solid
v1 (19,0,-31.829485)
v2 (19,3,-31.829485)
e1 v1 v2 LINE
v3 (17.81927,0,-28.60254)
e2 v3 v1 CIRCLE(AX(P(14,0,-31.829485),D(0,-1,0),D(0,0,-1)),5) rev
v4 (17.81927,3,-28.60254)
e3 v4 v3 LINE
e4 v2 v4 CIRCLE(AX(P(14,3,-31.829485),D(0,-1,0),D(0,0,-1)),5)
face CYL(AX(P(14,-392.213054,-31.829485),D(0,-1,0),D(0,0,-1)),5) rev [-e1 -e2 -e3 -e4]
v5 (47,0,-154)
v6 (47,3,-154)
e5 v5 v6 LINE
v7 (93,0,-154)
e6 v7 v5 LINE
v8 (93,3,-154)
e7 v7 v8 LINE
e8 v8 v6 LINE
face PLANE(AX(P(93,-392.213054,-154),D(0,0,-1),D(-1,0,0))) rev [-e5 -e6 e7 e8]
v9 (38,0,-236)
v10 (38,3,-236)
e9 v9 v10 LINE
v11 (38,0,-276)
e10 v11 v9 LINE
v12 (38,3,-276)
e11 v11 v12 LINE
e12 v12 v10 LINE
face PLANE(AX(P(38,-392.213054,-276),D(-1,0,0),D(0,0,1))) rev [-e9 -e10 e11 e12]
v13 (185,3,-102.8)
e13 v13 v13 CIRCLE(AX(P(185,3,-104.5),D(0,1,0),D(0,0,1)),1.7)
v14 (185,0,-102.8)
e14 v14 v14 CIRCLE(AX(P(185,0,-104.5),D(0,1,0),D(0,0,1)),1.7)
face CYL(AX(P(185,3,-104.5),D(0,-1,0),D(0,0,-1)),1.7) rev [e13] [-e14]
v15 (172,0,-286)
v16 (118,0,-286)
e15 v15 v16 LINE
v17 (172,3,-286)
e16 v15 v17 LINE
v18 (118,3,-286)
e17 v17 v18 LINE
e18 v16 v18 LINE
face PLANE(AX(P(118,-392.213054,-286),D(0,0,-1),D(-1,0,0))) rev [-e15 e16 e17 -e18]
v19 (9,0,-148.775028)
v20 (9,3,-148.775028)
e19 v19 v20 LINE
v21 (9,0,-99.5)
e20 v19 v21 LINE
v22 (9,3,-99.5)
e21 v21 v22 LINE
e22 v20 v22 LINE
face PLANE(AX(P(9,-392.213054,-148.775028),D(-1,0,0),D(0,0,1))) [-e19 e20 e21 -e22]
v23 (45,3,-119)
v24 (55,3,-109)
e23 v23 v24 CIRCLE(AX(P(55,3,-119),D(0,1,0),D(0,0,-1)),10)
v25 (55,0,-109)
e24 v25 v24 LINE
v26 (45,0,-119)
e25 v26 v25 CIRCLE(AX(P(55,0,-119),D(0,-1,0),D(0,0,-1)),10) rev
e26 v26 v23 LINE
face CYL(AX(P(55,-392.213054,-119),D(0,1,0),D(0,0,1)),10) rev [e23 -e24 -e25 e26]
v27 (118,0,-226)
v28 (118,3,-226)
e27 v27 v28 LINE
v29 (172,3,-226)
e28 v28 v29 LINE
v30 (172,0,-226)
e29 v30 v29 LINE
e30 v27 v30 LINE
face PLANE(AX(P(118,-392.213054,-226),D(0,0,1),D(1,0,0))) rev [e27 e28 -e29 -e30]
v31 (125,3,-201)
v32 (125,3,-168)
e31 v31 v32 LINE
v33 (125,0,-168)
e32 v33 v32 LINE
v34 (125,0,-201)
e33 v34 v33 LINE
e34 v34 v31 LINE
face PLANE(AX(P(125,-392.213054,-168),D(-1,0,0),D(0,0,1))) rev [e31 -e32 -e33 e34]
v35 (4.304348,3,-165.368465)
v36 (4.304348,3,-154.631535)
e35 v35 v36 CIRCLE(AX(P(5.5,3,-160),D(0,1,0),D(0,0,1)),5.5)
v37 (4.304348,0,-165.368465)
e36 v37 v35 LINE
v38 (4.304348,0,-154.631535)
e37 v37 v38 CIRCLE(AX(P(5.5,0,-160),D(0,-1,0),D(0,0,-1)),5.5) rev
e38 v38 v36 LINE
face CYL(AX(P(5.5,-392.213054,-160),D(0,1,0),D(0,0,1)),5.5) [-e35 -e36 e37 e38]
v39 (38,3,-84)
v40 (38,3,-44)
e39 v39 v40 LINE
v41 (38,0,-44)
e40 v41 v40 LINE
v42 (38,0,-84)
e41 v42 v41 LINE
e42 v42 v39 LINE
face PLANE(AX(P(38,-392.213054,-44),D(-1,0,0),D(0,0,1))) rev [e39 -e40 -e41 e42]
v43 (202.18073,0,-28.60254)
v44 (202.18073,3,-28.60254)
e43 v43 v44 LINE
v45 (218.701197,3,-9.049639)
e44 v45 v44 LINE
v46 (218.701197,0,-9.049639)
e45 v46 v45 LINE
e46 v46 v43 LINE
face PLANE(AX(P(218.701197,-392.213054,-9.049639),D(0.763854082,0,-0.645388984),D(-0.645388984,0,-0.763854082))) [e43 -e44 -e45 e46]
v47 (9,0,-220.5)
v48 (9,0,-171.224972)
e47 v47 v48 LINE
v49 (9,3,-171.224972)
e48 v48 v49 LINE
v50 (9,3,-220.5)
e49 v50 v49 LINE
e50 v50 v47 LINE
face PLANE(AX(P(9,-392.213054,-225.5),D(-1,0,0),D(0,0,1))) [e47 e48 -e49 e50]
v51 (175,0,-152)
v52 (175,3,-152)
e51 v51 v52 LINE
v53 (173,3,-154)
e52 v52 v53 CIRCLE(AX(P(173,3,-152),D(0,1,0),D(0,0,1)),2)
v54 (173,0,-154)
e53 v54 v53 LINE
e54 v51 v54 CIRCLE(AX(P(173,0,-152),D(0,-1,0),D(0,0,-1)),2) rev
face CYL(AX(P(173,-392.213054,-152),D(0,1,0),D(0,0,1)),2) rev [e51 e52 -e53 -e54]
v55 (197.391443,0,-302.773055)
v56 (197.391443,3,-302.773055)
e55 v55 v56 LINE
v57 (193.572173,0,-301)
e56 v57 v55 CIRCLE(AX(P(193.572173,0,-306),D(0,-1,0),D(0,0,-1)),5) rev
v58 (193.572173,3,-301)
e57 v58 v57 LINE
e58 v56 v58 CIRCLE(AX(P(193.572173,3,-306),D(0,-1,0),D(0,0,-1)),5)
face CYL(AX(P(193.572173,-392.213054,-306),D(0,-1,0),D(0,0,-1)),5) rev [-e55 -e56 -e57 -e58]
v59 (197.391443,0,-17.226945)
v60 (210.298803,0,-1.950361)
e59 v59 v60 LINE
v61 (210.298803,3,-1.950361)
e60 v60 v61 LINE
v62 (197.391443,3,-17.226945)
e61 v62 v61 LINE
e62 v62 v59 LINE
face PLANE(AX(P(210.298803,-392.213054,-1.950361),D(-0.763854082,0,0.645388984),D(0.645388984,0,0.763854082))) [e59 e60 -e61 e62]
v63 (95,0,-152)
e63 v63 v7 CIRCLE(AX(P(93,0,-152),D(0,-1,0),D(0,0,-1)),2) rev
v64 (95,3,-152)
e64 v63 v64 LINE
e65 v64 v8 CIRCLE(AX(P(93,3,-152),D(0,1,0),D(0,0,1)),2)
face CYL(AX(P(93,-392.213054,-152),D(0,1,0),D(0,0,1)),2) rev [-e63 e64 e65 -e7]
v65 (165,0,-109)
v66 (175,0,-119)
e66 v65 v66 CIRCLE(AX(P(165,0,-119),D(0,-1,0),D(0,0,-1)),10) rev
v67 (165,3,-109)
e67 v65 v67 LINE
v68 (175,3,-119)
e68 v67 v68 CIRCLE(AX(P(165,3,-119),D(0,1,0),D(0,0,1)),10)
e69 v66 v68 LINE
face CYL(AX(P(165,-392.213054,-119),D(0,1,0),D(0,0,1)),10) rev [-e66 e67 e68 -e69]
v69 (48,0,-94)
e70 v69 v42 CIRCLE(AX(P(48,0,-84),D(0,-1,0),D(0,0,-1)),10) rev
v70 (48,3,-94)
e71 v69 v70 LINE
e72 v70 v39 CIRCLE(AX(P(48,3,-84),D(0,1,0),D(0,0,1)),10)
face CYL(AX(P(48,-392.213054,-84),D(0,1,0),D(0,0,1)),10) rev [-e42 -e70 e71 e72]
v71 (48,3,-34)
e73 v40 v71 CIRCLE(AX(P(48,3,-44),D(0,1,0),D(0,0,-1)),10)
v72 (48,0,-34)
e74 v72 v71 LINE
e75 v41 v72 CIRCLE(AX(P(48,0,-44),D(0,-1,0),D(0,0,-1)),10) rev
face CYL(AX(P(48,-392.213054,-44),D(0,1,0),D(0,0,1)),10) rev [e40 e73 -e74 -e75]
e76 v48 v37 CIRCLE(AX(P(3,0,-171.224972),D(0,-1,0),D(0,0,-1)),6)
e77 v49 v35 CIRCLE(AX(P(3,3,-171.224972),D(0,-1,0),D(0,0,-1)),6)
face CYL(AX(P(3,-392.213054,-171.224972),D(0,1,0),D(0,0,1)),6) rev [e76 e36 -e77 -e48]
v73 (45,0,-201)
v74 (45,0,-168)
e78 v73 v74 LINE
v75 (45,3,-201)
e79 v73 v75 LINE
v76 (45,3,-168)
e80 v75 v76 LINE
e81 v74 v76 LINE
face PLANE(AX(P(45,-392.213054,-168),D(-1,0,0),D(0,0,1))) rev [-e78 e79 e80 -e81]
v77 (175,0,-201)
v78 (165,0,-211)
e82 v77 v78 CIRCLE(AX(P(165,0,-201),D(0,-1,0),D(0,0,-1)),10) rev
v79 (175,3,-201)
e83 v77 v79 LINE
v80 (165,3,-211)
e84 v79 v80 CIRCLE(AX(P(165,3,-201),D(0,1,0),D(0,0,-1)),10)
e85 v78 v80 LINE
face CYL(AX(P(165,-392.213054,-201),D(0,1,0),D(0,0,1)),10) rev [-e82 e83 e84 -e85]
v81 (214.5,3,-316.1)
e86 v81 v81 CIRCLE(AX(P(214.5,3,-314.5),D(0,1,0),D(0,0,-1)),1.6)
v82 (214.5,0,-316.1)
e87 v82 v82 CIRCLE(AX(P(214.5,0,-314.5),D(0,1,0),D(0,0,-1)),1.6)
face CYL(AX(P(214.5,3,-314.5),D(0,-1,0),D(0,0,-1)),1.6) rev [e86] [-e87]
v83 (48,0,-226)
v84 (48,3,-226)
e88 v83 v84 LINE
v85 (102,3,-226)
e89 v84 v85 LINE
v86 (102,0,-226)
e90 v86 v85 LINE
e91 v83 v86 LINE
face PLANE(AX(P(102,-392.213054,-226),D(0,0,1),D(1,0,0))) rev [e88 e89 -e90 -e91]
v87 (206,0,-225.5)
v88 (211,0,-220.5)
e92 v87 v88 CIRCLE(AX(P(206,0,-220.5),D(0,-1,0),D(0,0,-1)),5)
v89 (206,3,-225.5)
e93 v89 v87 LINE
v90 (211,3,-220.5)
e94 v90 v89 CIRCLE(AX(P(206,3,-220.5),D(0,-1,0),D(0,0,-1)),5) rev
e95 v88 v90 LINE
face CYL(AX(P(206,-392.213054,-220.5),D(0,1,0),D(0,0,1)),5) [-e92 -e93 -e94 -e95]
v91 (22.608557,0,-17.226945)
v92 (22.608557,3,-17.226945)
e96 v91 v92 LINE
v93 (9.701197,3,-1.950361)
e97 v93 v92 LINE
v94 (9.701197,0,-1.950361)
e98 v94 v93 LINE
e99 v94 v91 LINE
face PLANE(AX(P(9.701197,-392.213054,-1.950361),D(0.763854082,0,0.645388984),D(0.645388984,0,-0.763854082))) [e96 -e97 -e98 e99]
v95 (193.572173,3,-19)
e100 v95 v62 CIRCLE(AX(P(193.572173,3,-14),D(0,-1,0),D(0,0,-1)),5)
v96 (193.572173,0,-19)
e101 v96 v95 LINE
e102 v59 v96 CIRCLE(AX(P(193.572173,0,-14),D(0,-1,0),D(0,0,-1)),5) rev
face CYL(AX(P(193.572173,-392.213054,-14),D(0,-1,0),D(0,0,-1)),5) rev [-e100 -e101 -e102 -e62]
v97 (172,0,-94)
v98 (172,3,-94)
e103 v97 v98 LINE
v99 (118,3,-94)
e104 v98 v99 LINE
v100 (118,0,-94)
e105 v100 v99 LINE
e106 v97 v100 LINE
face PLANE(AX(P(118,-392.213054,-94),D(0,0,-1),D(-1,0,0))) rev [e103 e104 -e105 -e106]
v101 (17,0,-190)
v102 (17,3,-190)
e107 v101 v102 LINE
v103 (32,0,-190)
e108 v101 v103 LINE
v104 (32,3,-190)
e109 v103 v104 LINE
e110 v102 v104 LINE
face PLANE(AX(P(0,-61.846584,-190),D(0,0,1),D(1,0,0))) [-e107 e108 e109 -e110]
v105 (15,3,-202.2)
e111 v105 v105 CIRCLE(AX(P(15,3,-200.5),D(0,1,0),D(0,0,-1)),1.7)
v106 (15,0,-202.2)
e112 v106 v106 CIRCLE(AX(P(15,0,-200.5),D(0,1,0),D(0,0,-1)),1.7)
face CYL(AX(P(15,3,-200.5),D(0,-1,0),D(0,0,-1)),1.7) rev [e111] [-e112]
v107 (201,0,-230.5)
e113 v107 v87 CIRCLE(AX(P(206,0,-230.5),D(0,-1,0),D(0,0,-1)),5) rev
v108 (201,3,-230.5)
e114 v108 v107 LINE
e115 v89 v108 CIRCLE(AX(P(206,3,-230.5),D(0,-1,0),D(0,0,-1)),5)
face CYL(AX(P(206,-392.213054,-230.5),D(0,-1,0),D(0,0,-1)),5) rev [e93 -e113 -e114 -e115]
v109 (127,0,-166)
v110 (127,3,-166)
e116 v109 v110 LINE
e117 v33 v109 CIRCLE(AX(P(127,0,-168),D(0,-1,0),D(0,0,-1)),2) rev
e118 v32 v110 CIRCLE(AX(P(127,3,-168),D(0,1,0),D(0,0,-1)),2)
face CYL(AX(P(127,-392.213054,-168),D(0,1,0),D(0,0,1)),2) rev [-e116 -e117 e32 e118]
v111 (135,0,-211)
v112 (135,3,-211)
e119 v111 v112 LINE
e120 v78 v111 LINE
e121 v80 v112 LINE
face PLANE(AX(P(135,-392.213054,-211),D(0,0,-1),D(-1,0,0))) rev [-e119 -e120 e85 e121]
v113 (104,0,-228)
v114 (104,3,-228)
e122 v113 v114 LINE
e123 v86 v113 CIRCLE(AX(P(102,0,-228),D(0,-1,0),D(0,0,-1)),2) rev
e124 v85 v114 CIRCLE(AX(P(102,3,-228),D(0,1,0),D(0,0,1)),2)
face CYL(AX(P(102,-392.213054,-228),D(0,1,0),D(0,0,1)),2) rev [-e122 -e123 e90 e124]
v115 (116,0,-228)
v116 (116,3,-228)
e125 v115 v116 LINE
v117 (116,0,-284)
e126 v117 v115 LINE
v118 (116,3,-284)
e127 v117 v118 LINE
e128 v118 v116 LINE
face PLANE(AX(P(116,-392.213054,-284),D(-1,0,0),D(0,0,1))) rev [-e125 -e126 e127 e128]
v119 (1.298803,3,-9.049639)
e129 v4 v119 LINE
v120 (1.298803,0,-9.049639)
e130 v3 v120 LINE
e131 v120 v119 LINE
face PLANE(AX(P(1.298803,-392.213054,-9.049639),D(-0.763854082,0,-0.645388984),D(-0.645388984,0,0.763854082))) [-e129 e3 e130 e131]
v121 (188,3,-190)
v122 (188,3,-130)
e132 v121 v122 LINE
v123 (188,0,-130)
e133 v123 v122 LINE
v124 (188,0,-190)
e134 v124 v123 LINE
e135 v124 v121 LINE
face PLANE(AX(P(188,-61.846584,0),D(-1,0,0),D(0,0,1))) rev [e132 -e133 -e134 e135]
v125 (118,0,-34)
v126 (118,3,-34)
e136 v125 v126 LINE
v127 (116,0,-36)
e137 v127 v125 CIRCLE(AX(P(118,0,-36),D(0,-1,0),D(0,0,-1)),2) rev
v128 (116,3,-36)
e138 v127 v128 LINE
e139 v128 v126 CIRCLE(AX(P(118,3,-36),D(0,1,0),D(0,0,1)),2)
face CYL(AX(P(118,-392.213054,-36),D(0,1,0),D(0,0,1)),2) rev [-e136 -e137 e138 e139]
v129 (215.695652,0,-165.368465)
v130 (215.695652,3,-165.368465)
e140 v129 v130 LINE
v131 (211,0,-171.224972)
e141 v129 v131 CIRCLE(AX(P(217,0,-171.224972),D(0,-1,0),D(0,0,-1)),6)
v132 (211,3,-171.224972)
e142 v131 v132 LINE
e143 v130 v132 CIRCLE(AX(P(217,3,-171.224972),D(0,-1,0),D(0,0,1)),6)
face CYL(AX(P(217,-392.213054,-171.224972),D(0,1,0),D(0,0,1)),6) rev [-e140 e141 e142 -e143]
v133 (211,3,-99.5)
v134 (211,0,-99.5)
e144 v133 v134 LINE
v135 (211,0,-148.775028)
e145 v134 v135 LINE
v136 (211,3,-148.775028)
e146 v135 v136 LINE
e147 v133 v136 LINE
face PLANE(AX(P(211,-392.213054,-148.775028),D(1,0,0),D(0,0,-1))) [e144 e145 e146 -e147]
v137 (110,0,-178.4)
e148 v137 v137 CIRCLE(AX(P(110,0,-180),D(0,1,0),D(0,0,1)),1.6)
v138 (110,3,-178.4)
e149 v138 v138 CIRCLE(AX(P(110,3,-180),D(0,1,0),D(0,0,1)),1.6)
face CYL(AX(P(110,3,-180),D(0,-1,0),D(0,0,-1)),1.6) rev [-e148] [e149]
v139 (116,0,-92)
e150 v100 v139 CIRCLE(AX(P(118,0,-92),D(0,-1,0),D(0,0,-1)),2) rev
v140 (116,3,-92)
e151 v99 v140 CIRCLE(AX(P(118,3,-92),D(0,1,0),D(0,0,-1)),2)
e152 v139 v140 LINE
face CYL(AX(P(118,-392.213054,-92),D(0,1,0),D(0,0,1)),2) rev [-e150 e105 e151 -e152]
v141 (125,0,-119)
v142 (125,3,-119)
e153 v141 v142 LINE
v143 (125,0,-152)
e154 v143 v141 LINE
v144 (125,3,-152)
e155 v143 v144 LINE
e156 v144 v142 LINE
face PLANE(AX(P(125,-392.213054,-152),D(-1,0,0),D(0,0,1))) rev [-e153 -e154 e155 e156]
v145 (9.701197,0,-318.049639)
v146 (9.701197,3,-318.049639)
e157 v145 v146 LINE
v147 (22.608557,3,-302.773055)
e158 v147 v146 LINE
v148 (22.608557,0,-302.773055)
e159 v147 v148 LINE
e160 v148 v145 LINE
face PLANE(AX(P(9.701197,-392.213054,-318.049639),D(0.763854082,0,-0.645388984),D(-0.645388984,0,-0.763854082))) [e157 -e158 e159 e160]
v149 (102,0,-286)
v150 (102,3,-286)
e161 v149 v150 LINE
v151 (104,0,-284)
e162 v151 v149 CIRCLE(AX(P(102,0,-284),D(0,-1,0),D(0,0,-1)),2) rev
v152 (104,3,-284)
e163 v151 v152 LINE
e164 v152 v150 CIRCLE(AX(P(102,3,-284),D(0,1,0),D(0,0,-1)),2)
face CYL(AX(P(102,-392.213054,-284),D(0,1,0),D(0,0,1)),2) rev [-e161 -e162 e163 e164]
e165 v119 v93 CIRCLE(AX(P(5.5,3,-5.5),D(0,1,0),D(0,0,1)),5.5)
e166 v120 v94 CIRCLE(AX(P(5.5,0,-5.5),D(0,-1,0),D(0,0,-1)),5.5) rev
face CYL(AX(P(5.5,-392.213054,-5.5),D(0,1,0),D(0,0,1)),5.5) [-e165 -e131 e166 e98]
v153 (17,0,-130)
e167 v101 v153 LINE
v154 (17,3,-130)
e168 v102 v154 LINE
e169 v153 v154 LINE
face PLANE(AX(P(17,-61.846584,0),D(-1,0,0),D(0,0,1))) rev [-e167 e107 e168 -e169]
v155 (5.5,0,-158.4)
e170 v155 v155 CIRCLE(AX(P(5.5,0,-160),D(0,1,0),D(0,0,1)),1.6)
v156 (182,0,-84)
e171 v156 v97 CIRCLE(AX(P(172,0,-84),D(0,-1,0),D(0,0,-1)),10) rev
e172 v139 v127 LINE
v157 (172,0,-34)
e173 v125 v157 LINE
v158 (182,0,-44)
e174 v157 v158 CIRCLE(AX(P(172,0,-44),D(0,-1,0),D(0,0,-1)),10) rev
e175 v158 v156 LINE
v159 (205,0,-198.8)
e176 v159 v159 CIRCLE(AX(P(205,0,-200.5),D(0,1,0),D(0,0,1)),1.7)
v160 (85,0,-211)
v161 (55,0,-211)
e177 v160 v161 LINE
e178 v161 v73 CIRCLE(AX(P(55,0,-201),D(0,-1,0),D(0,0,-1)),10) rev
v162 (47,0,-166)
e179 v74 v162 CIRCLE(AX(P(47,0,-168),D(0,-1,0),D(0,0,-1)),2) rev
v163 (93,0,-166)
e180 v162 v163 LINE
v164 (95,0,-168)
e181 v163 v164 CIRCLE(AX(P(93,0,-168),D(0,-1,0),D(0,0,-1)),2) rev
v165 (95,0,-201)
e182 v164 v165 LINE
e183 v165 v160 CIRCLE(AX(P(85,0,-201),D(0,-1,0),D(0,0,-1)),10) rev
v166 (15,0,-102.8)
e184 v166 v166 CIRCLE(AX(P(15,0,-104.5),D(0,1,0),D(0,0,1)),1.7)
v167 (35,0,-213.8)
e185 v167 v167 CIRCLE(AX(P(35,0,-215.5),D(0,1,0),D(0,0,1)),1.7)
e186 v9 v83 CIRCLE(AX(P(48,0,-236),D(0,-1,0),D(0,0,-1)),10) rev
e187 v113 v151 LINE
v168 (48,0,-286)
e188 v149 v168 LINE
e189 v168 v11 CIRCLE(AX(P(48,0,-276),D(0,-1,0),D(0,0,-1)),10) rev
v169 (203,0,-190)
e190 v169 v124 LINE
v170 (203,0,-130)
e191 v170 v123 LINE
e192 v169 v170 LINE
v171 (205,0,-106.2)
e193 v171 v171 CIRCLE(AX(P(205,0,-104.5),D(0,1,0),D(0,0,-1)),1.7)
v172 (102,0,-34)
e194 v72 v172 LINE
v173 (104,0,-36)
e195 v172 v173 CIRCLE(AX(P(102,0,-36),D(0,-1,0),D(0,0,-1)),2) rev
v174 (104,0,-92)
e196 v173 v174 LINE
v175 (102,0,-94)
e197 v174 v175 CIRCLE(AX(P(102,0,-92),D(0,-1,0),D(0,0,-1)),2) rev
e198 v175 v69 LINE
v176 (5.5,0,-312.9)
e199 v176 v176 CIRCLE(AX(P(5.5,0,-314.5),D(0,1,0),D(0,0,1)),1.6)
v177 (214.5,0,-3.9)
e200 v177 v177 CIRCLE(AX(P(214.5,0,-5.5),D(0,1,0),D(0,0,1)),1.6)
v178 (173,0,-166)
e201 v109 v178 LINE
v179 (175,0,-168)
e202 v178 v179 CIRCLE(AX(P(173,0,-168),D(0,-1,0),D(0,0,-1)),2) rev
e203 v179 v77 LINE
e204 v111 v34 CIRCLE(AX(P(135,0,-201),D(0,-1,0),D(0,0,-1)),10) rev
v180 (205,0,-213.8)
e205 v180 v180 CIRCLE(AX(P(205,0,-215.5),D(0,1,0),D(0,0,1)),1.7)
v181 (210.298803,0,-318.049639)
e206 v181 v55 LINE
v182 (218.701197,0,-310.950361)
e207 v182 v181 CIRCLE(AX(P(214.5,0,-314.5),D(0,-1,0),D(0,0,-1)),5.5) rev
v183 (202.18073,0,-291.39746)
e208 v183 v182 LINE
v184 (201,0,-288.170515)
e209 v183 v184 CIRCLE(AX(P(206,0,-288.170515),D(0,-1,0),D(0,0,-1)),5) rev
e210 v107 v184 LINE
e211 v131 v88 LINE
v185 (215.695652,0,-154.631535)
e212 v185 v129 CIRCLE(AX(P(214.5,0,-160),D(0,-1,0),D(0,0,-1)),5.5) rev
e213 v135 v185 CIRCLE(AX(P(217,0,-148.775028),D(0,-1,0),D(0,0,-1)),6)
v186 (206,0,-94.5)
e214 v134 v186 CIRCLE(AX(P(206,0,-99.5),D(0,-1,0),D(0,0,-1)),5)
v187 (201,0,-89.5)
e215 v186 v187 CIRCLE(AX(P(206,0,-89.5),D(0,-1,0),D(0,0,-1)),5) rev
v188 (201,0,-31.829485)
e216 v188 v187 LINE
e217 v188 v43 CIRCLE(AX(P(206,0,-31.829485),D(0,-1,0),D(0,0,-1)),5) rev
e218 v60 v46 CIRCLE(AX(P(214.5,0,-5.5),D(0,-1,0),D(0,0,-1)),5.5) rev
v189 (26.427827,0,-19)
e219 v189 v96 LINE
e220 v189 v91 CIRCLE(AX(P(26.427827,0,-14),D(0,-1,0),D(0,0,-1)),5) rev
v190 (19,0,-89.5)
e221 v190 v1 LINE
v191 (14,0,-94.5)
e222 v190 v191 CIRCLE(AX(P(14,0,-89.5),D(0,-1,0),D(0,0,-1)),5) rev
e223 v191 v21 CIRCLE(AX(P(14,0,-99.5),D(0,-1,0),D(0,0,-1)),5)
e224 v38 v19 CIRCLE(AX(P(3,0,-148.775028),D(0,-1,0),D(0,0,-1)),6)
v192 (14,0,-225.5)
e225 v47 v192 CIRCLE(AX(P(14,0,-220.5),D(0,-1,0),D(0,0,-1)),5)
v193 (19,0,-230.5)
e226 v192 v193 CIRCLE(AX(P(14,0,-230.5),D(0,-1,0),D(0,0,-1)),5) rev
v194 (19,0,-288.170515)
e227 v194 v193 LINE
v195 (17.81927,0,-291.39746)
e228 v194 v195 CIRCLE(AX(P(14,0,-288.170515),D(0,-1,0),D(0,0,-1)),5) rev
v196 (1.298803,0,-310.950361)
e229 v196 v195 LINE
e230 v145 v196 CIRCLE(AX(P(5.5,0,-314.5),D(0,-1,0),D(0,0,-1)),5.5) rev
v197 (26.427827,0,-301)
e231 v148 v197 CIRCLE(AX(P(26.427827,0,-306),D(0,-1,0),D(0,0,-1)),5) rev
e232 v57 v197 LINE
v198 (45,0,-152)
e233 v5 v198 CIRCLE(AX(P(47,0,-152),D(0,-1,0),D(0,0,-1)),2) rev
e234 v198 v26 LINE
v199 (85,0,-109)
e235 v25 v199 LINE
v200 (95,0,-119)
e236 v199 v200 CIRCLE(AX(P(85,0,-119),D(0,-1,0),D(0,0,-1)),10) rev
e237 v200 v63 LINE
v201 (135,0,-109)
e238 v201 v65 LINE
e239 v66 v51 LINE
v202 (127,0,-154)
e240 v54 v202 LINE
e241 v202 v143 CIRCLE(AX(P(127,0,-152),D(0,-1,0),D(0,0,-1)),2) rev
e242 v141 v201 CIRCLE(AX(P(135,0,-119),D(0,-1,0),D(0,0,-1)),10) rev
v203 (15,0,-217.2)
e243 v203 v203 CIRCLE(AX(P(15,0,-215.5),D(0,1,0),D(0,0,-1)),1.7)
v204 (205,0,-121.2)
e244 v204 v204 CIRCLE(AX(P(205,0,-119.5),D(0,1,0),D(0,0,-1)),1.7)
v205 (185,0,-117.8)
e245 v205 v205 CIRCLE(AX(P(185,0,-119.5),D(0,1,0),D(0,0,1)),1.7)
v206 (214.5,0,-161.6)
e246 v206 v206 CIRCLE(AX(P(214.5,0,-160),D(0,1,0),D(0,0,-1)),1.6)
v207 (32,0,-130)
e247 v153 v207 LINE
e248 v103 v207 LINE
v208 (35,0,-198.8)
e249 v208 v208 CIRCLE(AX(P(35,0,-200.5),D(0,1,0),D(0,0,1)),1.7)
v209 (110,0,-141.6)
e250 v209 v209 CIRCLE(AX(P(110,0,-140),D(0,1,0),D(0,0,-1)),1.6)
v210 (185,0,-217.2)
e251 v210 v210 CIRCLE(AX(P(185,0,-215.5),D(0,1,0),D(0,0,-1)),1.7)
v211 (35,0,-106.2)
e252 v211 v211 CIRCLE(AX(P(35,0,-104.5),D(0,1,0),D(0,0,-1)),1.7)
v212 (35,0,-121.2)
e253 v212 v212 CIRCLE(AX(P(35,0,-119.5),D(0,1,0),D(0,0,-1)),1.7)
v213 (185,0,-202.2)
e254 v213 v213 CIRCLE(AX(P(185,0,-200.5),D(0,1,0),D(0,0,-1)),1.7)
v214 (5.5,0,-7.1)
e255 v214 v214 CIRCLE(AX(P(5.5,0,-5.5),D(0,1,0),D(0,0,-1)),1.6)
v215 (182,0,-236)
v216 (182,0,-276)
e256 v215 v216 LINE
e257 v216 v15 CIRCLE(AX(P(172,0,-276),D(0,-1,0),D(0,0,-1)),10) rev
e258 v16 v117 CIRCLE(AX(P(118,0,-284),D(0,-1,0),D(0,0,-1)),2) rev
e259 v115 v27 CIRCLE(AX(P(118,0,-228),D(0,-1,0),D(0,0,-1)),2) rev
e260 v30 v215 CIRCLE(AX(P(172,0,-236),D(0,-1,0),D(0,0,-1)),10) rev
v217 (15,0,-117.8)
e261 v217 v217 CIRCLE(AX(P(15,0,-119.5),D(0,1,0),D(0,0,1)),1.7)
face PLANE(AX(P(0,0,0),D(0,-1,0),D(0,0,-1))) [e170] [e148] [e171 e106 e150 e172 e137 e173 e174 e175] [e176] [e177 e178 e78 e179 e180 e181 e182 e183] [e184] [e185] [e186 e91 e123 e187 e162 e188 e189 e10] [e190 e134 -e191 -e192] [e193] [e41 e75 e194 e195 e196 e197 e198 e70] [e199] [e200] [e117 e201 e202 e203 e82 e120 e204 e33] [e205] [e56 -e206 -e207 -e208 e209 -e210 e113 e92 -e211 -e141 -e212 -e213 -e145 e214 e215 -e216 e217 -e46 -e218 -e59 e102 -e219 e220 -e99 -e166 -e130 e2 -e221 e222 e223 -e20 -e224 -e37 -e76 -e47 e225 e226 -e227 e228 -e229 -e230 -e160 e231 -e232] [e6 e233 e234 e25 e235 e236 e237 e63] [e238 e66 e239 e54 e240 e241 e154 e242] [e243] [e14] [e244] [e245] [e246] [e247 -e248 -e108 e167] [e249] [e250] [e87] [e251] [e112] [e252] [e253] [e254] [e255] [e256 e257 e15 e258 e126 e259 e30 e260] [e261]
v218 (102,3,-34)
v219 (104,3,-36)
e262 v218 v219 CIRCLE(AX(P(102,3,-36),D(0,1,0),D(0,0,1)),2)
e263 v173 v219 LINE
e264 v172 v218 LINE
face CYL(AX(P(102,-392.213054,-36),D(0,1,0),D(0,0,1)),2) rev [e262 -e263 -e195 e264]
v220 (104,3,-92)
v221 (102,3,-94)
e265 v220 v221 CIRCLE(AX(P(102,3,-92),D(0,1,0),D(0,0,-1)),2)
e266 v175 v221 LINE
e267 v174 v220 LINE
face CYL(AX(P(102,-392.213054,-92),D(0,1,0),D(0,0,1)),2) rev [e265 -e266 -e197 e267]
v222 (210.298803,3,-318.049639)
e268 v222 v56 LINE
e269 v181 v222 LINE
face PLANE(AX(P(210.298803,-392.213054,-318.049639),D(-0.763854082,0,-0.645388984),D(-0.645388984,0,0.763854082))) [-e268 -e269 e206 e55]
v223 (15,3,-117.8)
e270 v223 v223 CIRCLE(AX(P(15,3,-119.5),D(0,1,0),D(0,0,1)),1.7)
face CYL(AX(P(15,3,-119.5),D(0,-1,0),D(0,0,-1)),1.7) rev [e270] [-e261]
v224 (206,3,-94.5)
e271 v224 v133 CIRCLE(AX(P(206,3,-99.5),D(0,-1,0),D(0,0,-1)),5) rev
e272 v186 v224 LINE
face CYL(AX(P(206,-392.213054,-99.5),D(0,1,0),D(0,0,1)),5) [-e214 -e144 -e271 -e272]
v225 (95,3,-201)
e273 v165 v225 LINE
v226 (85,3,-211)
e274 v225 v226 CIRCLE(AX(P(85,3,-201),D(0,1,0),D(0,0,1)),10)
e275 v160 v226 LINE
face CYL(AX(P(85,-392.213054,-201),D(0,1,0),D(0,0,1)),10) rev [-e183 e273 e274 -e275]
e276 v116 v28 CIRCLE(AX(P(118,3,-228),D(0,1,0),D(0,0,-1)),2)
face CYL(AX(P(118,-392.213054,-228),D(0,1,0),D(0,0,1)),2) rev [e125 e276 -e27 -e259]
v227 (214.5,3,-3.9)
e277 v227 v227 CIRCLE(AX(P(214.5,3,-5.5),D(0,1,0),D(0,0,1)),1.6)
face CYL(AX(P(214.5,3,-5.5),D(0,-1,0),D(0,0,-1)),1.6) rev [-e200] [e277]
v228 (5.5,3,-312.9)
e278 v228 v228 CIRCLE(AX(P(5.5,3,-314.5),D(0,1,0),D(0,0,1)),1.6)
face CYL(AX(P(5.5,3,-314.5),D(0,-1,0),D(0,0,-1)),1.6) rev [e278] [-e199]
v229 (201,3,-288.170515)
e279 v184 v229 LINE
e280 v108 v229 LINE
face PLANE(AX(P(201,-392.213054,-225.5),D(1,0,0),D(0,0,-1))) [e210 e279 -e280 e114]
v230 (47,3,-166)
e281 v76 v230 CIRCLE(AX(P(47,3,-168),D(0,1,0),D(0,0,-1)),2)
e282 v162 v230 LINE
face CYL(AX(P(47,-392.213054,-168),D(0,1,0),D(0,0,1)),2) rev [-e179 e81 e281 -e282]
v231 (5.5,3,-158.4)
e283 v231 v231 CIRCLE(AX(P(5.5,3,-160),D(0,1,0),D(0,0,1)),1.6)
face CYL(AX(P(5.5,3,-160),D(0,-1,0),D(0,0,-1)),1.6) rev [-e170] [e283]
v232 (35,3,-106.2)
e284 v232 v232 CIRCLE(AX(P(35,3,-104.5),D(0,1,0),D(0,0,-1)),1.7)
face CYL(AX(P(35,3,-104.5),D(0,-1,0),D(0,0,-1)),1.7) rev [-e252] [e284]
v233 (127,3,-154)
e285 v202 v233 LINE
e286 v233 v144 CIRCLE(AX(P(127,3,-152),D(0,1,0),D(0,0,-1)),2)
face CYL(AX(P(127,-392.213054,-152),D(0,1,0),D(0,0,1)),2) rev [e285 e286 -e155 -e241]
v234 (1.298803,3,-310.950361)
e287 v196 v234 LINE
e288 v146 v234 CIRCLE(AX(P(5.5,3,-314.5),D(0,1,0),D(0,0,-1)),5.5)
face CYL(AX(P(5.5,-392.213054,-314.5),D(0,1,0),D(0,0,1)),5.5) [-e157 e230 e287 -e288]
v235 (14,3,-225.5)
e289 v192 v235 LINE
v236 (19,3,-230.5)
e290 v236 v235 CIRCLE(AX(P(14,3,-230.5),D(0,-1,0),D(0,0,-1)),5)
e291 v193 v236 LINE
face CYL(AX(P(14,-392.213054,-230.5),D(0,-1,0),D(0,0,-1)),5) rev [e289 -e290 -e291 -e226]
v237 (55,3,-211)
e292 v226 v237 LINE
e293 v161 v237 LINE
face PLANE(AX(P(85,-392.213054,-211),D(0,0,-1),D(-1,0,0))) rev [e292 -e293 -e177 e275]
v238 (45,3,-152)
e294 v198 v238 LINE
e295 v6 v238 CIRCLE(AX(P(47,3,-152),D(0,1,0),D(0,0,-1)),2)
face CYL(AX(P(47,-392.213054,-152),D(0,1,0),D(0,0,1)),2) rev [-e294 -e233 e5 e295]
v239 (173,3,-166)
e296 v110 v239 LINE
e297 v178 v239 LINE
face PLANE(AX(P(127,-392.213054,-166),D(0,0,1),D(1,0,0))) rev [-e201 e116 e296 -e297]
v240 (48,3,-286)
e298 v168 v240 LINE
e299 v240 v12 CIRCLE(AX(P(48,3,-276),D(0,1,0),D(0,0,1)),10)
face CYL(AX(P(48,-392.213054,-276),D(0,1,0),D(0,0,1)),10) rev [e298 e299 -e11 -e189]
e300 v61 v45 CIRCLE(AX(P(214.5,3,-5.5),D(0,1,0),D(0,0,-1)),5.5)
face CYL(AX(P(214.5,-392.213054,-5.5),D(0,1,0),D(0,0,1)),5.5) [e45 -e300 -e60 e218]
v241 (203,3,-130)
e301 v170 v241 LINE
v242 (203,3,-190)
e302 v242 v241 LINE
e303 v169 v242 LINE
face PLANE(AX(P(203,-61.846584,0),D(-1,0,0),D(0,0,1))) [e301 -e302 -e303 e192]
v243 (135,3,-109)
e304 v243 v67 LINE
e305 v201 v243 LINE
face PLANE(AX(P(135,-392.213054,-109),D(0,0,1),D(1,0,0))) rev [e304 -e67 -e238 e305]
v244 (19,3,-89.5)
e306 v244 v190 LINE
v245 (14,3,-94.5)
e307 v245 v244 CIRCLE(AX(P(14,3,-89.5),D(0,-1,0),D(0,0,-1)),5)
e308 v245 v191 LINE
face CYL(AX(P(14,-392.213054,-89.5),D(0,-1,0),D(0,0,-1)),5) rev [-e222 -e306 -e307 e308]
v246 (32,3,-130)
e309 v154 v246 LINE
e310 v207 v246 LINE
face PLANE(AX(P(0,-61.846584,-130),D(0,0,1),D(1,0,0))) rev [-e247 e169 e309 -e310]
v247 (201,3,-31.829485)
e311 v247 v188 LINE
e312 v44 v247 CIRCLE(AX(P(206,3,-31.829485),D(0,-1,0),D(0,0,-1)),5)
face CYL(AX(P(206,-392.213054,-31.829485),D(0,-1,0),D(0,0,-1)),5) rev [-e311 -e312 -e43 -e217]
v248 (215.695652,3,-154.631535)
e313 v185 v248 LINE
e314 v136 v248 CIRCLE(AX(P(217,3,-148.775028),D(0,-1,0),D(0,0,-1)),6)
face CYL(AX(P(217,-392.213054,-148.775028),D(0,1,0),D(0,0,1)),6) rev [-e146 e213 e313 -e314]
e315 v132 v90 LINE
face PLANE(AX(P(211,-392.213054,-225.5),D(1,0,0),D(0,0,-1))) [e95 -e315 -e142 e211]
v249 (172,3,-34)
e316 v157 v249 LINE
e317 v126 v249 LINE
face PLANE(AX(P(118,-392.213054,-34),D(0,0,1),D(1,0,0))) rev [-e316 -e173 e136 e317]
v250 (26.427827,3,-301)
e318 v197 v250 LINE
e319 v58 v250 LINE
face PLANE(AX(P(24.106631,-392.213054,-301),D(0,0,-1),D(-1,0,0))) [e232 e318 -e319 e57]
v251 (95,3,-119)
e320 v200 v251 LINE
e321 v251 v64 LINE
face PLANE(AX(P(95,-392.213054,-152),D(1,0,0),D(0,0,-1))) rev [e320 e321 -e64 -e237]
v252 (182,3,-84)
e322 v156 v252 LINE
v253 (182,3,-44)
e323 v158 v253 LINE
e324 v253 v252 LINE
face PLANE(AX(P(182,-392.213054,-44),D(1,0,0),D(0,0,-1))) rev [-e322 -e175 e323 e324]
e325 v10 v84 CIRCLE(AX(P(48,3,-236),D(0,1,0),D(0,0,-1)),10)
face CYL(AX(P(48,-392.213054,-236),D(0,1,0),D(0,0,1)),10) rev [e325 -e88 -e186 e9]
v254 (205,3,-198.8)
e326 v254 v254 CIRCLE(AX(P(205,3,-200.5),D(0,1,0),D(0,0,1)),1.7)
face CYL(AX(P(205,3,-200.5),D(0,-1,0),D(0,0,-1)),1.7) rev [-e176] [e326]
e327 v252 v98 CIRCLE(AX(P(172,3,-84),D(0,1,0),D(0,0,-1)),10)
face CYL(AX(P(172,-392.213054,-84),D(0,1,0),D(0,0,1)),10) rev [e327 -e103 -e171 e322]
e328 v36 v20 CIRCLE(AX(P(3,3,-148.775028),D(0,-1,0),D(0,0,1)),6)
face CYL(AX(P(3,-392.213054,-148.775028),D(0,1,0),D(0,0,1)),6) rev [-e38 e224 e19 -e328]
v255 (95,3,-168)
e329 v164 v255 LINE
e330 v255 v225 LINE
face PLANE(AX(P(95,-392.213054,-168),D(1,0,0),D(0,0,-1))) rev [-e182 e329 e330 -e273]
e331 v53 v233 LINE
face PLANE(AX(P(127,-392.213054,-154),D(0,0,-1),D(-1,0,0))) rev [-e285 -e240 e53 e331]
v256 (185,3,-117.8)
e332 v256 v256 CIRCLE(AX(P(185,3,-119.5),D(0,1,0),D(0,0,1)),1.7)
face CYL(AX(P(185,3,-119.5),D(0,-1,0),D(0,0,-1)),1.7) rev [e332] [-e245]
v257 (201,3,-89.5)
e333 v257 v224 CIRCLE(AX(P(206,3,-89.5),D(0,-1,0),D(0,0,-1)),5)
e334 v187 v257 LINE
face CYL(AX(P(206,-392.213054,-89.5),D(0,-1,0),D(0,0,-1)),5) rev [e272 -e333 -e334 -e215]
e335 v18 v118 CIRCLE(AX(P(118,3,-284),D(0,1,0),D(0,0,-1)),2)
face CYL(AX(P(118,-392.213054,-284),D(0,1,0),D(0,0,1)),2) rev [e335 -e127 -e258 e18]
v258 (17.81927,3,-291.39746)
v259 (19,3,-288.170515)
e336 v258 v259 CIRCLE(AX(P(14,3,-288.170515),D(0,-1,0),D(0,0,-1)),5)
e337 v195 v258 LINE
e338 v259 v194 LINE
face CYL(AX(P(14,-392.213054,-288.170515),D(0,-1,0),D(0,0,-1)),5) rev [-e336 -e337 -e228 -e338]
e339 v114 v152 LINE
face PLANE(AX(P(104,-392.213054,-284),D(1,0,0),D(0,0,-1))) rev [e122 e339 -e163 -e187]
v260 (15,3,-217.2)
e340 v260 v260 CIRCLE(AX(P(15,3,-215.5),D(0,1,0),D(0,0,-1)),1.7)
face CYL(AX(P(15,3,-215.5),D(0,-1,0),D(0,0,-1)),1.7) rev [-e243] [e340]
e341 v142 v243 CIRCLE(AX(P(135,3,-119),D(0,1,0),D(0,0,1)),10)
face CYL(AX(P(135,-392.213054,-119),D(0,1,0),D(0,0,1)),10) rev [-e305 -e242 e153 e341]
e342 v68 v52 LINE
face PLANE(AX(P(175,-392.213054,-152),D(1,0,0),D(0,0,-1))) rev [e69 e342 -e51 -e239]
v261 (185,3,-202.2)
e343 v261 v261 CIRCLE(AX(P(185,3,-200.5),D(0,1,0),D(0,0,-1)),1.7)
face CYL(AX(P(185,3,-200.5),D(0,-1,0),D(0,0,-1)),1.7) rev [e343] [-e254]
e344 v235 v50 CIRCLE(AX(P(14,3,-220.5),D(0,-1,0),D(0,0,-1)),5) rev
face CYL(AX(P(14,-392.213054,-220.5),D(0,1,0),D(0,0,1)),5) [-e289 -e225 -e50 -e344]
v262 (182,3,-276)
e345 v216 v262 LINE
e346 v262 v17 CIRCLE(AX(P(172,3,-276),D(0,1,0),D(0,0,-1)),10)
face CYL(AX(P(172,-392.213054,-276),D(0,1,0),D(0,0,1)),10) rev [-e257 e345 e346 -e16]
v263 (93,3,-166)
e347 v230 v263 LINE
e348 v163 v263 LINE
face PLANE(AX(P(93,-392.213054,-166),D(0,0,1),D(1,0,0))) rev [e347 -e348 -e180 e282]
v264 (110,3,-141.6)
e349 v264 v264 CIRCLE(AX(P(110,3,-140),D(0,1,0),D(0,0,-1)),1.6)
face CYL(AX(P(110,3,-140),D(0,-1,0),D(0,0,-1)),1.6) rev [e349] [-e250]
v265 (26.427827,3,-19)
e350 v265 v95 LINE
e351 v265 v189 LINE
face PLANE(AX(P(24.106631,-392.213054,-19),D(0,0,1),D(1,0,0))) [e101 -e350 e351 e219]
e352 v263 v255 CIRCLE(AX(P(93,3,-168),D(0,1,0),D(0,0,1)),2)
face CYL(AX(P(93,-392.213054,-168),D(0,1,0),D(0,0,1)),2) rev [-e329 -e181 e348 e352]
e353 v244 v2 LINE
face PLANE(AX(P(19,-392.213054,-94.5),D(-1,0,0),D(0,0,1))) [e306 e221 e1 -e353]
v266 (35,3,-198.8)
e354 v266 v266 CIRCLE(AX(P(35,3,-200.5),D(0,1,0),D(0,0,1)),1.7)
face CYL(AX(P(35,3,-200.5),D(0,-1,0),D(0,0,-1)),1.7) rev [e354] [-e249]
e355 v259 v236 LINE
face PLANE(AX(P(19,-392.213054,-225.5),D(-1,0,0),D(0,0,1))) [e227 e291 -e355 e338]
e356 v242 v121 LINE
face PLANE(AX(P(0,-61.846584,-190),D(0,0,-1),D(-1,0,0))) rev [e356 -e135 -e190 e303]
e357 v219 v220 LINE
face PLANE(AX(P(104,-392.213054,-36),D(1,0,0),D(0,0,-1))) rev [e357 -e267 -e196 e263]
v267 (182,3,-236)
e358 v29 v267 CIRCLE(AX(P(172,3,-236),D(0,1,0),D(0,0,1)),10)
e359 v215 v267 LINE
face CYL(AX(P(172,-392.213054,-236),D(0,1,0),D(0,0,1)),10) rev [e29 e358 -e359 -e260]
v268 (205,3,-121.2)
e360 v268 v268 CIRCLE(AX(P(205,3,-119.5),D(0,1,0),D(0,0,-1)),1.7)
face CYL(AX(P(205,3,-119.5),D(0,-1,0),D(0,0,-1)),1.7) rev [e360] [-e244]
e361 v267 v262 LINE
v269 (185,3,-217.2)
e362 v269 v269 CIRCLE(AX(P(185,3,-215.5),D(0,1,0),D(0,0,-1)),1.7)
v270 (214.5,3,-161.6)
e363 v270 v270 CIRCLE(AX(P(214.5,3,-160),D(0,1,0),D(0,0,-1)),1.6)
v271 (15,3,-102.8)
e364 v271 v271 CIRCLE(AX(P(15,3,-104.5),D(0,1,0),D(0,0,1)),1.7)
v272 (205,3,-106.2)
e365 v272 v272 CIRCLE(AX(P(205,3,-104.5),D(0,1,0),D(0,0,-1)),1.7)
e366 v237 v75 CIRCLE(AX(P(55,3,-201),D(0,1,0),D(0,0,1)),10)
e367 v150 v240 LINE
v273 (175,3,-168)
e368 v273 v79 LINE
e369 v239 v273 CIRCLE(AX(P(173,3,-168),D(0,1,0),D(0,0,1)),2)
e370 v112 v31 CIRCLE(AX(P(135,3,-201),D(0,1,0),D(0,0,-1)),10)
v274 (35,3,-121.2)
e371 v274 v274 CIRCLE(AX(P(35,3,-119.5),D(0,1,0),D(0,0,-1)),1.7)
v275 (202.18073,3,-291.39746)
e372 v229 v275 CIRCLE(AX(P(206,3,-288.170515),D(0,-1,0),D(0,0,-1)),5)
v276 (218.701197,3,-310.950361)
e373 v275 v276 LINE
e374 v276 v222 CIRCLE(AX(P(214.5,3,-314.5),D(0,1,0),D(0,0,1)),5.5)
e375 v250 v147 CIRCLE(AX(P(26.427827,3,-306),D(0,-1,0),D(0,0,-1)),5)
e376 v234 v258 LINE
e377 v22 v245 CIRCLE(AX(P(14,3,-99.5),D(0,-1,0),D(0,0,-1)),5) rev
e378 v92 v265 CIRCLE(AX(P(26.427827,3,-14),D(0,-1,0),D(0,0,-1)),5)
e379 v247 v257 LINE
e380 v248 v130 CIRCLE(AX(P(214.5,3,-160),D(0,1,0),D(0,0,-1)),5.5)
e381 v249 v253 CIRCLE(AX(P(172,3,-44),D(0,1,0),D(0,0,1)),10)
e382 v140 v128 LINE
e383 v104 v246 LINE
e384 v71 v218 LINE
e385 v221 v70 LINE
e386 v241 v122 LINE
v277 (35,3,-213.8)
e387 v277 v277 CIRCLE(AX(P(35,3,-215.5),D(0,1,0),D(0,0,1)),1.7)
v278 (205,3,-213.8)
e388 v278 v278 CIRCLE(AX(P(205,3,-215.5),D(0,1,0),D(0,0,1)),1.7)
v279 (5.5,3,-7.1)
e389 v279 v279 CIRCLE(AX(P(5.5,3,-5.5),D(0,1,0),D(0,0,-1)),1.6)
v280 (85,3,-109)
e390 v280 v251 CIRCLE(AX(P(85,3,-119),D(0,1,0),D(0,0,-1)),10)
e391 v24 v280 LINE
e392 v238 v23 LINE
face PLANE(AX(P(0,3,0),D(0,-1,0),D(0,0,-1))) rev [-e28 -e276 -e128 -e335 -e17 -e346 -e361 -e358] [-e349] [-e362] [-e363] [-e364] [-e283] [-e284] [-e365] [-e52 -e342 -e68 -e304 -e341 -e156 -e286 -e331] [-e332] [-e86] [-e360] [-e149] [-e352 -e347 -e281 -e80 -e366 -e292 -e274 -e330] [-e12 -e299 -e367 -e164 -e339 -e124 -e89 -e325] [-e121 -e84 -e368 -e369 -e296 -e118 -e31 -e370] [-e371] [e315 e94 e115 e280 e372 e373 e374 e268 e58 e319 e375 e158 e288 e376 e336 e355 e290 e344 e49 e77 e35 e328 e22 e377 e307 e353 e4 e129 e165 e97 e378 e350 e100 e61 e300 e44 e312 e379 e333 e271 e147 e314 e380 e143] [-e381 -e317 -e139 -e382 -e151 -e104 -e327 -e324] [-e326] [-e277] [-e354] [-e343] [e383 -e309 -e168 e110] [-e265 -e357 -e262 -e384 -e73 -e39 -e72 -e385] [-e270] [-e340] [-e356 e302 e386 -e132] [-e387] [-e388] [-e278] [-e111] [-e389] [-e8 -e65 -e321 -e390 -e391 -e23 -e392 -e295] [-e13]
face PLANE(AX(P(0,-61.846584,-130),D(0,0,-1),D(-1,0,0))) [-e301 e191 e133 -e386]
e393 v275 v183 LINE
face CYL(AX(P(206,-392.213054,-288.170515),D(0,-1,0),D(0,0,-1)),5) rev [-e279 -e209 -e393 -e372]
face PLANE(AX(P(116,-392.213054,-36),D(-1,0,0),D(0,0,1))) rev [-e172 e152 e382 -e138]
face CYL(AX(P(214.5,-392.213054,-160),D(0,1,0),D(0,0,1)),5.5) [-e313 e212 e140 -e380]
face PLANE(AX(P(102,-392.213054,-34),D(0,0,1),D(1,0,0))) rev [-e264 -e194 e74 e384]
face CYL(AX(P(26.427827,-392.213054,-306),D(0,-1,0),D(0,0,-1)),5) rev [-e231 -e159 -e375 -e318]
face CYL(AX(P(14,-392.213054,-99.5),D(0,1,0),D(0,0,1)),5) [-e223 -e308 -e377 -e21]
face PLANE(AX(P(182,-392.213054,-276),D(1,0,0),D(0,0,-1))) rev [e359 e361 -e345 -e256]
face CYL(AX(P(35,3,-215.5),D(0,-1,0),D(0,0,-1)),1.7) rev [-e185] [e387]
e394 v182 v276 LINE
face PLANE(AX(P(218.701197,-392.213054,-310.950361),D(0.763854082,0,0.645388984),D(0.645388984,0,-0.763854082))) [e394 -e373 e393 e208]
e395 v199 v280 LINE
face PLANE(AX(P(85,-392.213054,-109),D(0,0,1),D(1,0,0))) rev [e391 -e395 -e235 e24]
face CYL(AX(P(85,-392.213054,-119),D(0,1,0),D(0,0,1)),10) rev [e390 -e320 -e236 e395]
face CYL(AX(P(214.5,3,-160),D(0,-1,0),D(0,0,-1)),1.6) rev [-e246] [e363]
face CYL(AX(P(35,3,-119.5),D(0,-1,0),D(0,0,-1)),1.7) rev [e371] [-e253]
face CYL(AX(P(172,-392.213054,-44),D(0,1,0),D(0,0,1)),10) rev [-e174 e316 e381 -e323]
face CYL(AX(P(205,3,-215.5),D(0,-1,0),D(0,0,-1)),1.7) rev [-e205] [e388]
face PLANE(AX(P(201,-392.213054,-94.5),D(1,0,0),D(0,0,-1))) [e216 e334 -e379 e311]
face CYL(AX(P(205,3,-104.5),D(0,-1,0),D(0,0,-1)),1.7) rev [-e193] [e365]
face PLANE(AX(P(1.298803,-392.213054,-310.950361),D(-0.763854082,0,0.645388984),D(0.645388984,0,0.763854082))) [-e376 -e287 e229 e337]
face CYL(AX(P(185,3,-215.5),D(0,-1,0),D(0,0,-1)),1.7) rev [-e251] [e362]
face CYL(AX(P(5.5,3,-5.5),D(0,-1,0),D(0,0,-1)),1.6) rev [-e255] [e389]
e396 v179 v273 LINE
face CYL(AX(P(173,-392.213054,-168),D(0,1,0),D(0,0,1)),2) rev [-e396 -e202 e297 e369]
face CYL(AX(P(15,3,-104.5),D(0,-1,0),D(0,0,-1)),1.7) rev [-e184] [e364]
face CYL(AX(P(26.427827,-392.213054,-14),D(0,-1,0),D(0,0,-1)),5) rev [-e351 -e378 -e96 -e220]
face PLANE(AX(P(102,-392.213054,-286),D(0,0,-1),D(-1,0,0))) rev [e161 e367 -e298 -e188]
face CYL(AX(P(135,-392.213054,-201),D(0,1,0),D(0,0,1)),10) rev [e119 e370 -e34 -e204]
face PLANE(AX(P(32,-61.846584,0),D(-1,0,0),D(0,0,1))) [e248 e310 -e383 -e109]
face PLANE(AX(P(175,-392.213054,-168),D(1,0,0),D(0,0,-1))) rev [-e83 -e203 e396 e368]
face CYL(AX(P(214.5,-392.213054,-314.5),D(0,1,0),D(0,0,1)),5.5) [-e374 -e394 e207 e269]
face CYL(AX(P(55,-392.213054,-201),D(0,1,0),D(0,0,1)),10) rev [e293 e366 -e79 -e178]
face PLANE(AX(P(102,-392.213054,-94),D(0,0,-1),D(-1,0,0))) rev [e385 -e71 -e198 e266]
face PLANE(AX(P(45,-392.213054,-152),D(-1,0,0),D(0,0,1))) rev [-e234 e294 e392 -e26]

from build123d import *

# Parameters (mm, degrees)
CROQUIS1_W              = 220
CROQUIS1_H              = 320
CROQUIS1_R              = 1.7
CROQUIS1_R_2            = 1.6
SALIENTE_EXTRUIR1_DEPTH = 3
CROQUIS2_OUTSIDE_W      = 299.668
CROQUIS2_OUTSIDE_H      = 399.668
CORTAR_EXTRUIR1_DEPTH   = 3
REDONDEO1_R             = 5
CROQUIS4_W              = 15
CROQUIS4_H              = 60
CORTAR_EXTRUIR3_DEPTH   = 3


with BuildPart() as part:
    # Croquis1 → Saliente-Extruir1 (new body)
    with BuildSketch(Plane(origin=(0, 0, 0), x_dir=(1, 0, 0), z_dir=(0, 1, 0))):
        with Locations((110, 160)):
            Rectangle(CROQUIS1_W, CROQUIS1_H)
        with Locations(Location((35, 215.5, 0), (0, 0, 270))):
            Circle(CROQUIS1_R, mode=Mode.SUBTRACT)
        with Locations(Location((35, 200.5, 0), (0, 0, 270))):
            Circle(CROQUIS1_R, mode=Mode.SUBTRACT)
        with Locations(Location((35, 119.5, 0), (0, 0, 90))):
            Circle(CROQUIS1_R, mode=Mode.SUBTRACT)
        with Locations(Location((35, 104.5, 0), (0, 0, 90))):
            Circle(CROQUIS1_R, mode=Mode.SUBTRACT)
        with Locations(Location((5.5, 314.5, 0), (0, 0, 270))):
            Circle(CROQUIS1_R_2, mode=Mode.SUBTRACT)
        with Locations(Location((214.5, 314.5, 0), (0, 0, 90))):
            Circle(CROQUIS1_R_2, mode=Mode.SUBTRACT)
        with Locations(Location((214.5, 5.5, 0), (0, 0, 270))):
            Circle(CROQUIS1_R_2, mode=Mode.SUBTRACT)
        with Locations(Location((5.5, 5.5, 0), (0, 0, 90))):
            Circle(CROQUIS1_R_2, mode=Mode.SUBTRACT)
        with Locations(Location((15, 200.5, 0), (0, 0, 90))):
            Circle(CROQUIS1_R, mode=Mode.SUBTRACT)
        with Locations(Location((15, 215.5, 0), (0, 0, 90))):
            Circle(CROQUIS1_R, mode=Mode.SUBTRACT)
        with Locations(Location((15, 104.5, 0), (0, 0, 270))):
            Circle(CROQUIS1_R, mode=Mode.SUBTRACT)
        with Locations(Location((15, 119.5, 0), (0, 0, 270))):
            Circle(CROQUIS1_R, mode=Mode.SUBTRACT)
        with Locations(Location((110, 180, 0), (0, 0, 270))):
            Circle(CROQUIS1_R_2, mode=Mode.SUBTRACT)
        with Locations(Location((110, 140, 0), (0, 0, 90))):
            Circle(CROQUIS1_R_2, mode=Mode.SUBTRACT)
        with Locations(Location((5.5, 160, 0), (0, 0, 270))):
            Circle(CROQUIS1_R_2, mode=Mode.SUBTRACT)
        with Locations(Location((214.5, 160, 0), (0, 0, 90))):
            Circle(CROQUIS1_R_2, mode=Mode.SUBTRACT)
        with Locations(Location((185, 104.5, 0), (0, 0, 270))):
            Circle(CROQUIS1_R, mode=Mode.SUBTRACT)
        with Locations(Location((185, 119.5, 0), (0, 0, 270))):
            Circle(CROQUIS1_R, mode=Mode.SUBTRACT)
        with Locations(Location((205, 119.5, 0), (0, 0, 90))):
            Circle(CROQUIS1_R, mode=Mode.SUBTRACT)
        with Locations(Location((205, 104.5, 0), (0, 0, 90))):
            Circle(CROQUIS1_R, mode=Mode.SUBTRACT)
        with Locations(Location((185, 215.5, 0), (0, 0, 90))):
            Circle(CROQUIS1_R, mode=Mode.SUBTRACT)
        with Locations(Location((185, 200.5, 0), (0, 0, 90))):
            Circle(CROQUIS1_R, mode=Mode.SUBTRACT)
        with Locations(Location((205, 200.5, 0), (0, 0, 270))):
            Circle(CROQUIS1_R, mode=Mode.SUBTRACT)
        with Locations(Location((205, 215.5, 0), (0, 0, 270))):
            Circle(CROQUIS1_R, mode=Mode.SUBTRACT)
    extrude(amount=SALIENTE_EXTRUIR1_DEPTH)

    # Croquis2 outside → Cortar-Extruir1 (cut)
    # profile 1 of 9: a face of its own
    with BuildSketch(Plane(origin=(0, 3, 0), x_dir=(1, 0, 0), z_dir=(0, 1, 0))):
        with Locations((110, 160)):
            Rectangle(CROQUIS2_OUTSIDE_W, CROQUIS2_OUTSIDE_H)
        with BuildLine():
            Line((9, 148.77502784), (9, 94.5))
            Line((9, 94.5), (19, 94.5))
            Line((19, 94.5), (19, 30))
            Line((19, 30), (1.298802547, 9.049639413))
            ThreePointArc((1.298802547, 9.049639413), (1.950360587, 1.298802547), (9.701197453, 1.950360587))
            Line((9.701197453, 1.950360587), (24.106631311, 19))
            Line((24.106631311, 19), (195.893368689, 19))
            Line((195.893368689, 19), (210.298802547, 1.950360587))
            ThreePointArc((210.298802547, 1.950360587), (218.049639413, 1.298802547), (218.701197453, 9.049639413))
            Line((218.701197453, 9.049639413), (201, 30))
            Line((201, 30), (201, 94.5))
            Line((201, 94.5), (211, 94.5))
            Line((211, 94.5), (211, 148.77502784))
            ThreePointArc((211, 148.77502784), (212.318863014, 152.528287293), (215.695652174, 154.631535054))
            ThreePointArc((215.695652174, 154.631535054), (220, 160), (215.695652174, 165.368464946))
            ThreePointArc((215.695652174, 165.368464946), (212.318863014, 167.471712707), (211, 171.22497216))
            Line((211, 171.22497216), (211, 225.5))
            Line((211, 225.5), (201, 225.5))
            Line((201, 225.5), (201, 290))
            Line((201, 290), (218.701197453, 310.950360587))
            ThreePointArc((218.701197453, 310.950360587), (218.049639413, 318.701197453), (210.298802547, 318.049639413))
            Line((210.298802547, 318.049639413), (195.893368689, 301))
            Line((195.893368689, 301), (24.106631311, 301))
            Line((24.106631311, 301), (9.701197453, 318.049639413))
            ThreePointArc((9.701197453, 318.049639413), (1.950360587, 318.701197453), (1.298802547, 310.950360587))
            Line((1.298802547, 310.950360587), (19, 290))
            Line((19, 290), (19, 225.5))
            Line((19, 225.5), (9, 225.5))
            Line((9, 225.5), (9, 171.22497216))
            ThreePointArc((9, 171.22497216), (7.681136986, 167.471712707), (4.304347826, 165.368464946))
            ThreePointArc((4.304347826, 165.368464946), (0, 160), (4.304347826, 154.631535054))
            ThreePointArc((4.304347826, 154.631535054), (7.681136986, 152.528287293), (9, 148.77502784))
        make_face(mode=Mode.SUBTRACT)
    # profile 2 of 9: a face of its own
    with BuildSketch(Plane(origin=(0, 3, 0), x_dir=(1, 0, 0), z_dir=(0, 1, 0))):
        with BuildLine():
            Line((182, 276), (182, 236))
            ThreePointArc((182, 236), (179.071067812, 228.928932188), (172, 226))
            Line((172, 226), (118, 226))
            ThreePointArc((118, 226), (116.585786438, 226.585786438), (116, 228))
            Line((116, 228), (116, 284))
            ThreePointArc((116, 284), (116.585786438, 285.414213562), (118, 286))
            Line((118, 286), (172, 286))
            ThreePointArc((172, 286), (179.071067812, 283.071067812), (182, 276))
        make_face()
    # profile 3 of 9: a face of its own
    with BuildSketch(Plane(origin=(0, 3, 0), x_dir=(1, 0, 0), z_dir=(0, 1, 0))):
        with BuildLine():
            Line((102, 286), (48, 286))
            ThreePointArc((48, 286), (40.928932188, 283.071067812), (38, 276))
            Line((38, 276), (38, 236))
            ThreePointArc((38, 236), (40.928932188, 228.928932188), (48, 226))
            Line((48, 226), (102, 226))
            ThreePointArc((102, 226), (103.414213562, 226.585786438), (104, 228))
            Line((104, 228), (104, 284))
            ThreePointArc((104, 284), (103.414213562, 285.414213562), (102, 286))
        make_face()
    # profile 4 of 9: a face of its own
    with BuildSketch(Plane(origin=(0, 3, 0), x_dir=(1, 0, 0), z_dir=(0, 1, 0))):
        with BuildLine():
            Line((102, 94), (48, 94))
            ThreePointArc((48, 94), (40.928932188, 91.071067812), (38, 84))
            Line((38, 84), (38, 44))
            ThreePointArc((38, 44), (40.928932188, 36.928932188), (48, 34))
            Line((48, 34), (102, 34))
            ThreePointArc((102, 34), (103.414213562, 34.585786438), (104, 36))
            Line((104, 36), (104, 92))
            ThreePointArc((104, 92), (103.414213562, 93.414213562), (102, 94))
        make_face()
    # profile 5 of 9: a face of its own
    with BuildSketch(Plane(origin=(0, 3, 0), x_dir=(1, 0, 0), z_dir=(0, 1, 0))):
        with BuildLine():
            Line((116, 36), (116, 92))
            ThreePointArc((116, 92), (116.585786438, 93.414213562), (118, 94))
            Line((118, 94), (172, 94))
            ThreePointArc((172, 94), (179.071067812, 91.071067812), (182, 84))
            Line((182, 84), (182, 44))
            ThreePointArc((182, 44), (179.071067812, 36.928932188), (172, 34))
            Line((172, 34), (118, 34))
            ThreePointArc((118, 34), (116.585786438, 34.585786438), (116, 36))
        make_face()
    # profile 6 of 9: a face of its own
    with BuildSketch(Plane(origin=(0, 3, 0), x_dir=(1, 0, 0), z_dir=(0, 1, 0))):
        with BuildLine():
            Line((45, 152), (45, 119))
            ThreePointArc((45, 119), (47.928932188, 111.928932188), (55, 109))
            Line((55, 109), (85, 109))
            ThreePointArc((85, 109), (92.071067812, 111.928932188), (95, 119))
            Line((95, 119), (95, 152))
            ThreePointArc((95, 152), (94.414213562, 153.414213562), (93, 154))
            Line((93, 154), (47, 154))
            ThreePointArc((47, 154), (45.585786438, 153.414213562), (45, 152))
        make_face()
    # profile 7 of 9: a face of its own
    with BuildSketch(Plane(origin=(0, 3, 0), x_dir=(1, 0, 0), z_dir=(0, 1, 0))):
        with BuildLine():
            Line((93, 166), (47, 166))
            ThreePointArc((47, 166), (45.585786438, 166.585786438), (45, 168))
            Line((45, 168), (45, 201))
            ThreePointArc((45, 201), (47.928932188, 208.071067812), (55, 211))
            Line((55, 211), (85, 211))
            ThreePointArc((85, 211), (92.071067812, 208.071067812), (95, 201))
            Line((95, 201), (95, 168))
            ThreePointArc((95, 168), (94.414213562, 166.585786438), (93, 166))
        make_face()
    # profile 8 of 9: a face of its own
    with BuildSketch(Plane(origin=(0, 3, 0), x_dir=(1, 0, 0), z_dir=(0, 1, 0))):
        with BuildLine():
            Line((135, 109), (165, 109))
            ThreePointArc((165, 109), (172.071067812, 111.928932188), (175, 119))
            Line((175, 119), (175, 152))
            ThreePointArc((175, 152), (174.414213562, 153.414213562), (173, 154))
            Line((173, 154), (127, 154))
            ThreePointArc((127, 154), (125.585786438, 153.414213562), (125, 152))
            Line((125, 152), (125, 119))
            ThreePointArc((125, 119), (127.928932188, 111.928932188), (135, 109))
        make_face()
    # profile 9 of 9: a face of its own
    with BuildSketch(Plane(origin=(0, 3, 0), x_dir=(1, 0, 0), z_dir=(0, 1, 0))):
        with BuildLine():
            Line((127, 166), (173, 166))
            ThreePointArc((173, 166), (174.414213562, 166.585786438), (175, 168))
            Line((175, 168), (175, 201))
            ThreePointArc((175, 201), (172.071067812, 208.071067812), (165, 211))
            Line((165, 211), (135, 211))
            ThreePointArc((135, 211), (127.928932188, 208.071067812), (125, 201))
            Line((125, 201), (125, 168))
            ThreePointArc((125, 168), (125.585786438, 166.585786438), (127, 166))
        make_face()
    extrude(amount=-CORTAR_EXTRUIR1_DEPTH, mode=Mode.SUBTRACT)

    # Redondeo1
    redondeo1_edges = [part.edges().sort_by_distance(p)[0] for p in [
        (211, 1.5, -225.5),
        (211, 1.5, -94.5),
        (9, 1.5, -225.5),
        (9, 1.5, -94.5),
        (24.106631311, 1.5, -301),
        (195.893368689, 1.5, -301),
        (201, 1.5, -290),
        (201, 1.5, -225.5),
        (201, 1.5, -94.5),
        (201, 1.5, -30),
        (195.893368689, 1.5, -19),
        (24.106631311, 1.5, -19),
        (19, 1.5, -30),
        (19, 1.5, -94.5),
        (19, 1.5, -290),
        (19, 1.5, -225.5),
    ]]
    fillet(redondeo1_edges, radius=REDONDEO1_R - 0.0001)  # a hair under: the kernel refuses the full size

    # Croquis4 → Cortar-Extruir3 (cut)
    with BuildSketch(Plane(origin=(0, 3, 0), x_dir=(1, 0, 0), z_dir=(0, 1, 0))):
        with Locations((24.5, 160)):
            Rectangle(CROQUIS4_W, CROQUIS4_H)
        with Locations((195.5, 160)):
            Rectangle(CROQUIS4_W, CROQUIS4_H)
    extrude(amount=-CORTAR_EXTRUIR3_DEPTH, mode=Mode.SUBTRACT)


solid = part.part
